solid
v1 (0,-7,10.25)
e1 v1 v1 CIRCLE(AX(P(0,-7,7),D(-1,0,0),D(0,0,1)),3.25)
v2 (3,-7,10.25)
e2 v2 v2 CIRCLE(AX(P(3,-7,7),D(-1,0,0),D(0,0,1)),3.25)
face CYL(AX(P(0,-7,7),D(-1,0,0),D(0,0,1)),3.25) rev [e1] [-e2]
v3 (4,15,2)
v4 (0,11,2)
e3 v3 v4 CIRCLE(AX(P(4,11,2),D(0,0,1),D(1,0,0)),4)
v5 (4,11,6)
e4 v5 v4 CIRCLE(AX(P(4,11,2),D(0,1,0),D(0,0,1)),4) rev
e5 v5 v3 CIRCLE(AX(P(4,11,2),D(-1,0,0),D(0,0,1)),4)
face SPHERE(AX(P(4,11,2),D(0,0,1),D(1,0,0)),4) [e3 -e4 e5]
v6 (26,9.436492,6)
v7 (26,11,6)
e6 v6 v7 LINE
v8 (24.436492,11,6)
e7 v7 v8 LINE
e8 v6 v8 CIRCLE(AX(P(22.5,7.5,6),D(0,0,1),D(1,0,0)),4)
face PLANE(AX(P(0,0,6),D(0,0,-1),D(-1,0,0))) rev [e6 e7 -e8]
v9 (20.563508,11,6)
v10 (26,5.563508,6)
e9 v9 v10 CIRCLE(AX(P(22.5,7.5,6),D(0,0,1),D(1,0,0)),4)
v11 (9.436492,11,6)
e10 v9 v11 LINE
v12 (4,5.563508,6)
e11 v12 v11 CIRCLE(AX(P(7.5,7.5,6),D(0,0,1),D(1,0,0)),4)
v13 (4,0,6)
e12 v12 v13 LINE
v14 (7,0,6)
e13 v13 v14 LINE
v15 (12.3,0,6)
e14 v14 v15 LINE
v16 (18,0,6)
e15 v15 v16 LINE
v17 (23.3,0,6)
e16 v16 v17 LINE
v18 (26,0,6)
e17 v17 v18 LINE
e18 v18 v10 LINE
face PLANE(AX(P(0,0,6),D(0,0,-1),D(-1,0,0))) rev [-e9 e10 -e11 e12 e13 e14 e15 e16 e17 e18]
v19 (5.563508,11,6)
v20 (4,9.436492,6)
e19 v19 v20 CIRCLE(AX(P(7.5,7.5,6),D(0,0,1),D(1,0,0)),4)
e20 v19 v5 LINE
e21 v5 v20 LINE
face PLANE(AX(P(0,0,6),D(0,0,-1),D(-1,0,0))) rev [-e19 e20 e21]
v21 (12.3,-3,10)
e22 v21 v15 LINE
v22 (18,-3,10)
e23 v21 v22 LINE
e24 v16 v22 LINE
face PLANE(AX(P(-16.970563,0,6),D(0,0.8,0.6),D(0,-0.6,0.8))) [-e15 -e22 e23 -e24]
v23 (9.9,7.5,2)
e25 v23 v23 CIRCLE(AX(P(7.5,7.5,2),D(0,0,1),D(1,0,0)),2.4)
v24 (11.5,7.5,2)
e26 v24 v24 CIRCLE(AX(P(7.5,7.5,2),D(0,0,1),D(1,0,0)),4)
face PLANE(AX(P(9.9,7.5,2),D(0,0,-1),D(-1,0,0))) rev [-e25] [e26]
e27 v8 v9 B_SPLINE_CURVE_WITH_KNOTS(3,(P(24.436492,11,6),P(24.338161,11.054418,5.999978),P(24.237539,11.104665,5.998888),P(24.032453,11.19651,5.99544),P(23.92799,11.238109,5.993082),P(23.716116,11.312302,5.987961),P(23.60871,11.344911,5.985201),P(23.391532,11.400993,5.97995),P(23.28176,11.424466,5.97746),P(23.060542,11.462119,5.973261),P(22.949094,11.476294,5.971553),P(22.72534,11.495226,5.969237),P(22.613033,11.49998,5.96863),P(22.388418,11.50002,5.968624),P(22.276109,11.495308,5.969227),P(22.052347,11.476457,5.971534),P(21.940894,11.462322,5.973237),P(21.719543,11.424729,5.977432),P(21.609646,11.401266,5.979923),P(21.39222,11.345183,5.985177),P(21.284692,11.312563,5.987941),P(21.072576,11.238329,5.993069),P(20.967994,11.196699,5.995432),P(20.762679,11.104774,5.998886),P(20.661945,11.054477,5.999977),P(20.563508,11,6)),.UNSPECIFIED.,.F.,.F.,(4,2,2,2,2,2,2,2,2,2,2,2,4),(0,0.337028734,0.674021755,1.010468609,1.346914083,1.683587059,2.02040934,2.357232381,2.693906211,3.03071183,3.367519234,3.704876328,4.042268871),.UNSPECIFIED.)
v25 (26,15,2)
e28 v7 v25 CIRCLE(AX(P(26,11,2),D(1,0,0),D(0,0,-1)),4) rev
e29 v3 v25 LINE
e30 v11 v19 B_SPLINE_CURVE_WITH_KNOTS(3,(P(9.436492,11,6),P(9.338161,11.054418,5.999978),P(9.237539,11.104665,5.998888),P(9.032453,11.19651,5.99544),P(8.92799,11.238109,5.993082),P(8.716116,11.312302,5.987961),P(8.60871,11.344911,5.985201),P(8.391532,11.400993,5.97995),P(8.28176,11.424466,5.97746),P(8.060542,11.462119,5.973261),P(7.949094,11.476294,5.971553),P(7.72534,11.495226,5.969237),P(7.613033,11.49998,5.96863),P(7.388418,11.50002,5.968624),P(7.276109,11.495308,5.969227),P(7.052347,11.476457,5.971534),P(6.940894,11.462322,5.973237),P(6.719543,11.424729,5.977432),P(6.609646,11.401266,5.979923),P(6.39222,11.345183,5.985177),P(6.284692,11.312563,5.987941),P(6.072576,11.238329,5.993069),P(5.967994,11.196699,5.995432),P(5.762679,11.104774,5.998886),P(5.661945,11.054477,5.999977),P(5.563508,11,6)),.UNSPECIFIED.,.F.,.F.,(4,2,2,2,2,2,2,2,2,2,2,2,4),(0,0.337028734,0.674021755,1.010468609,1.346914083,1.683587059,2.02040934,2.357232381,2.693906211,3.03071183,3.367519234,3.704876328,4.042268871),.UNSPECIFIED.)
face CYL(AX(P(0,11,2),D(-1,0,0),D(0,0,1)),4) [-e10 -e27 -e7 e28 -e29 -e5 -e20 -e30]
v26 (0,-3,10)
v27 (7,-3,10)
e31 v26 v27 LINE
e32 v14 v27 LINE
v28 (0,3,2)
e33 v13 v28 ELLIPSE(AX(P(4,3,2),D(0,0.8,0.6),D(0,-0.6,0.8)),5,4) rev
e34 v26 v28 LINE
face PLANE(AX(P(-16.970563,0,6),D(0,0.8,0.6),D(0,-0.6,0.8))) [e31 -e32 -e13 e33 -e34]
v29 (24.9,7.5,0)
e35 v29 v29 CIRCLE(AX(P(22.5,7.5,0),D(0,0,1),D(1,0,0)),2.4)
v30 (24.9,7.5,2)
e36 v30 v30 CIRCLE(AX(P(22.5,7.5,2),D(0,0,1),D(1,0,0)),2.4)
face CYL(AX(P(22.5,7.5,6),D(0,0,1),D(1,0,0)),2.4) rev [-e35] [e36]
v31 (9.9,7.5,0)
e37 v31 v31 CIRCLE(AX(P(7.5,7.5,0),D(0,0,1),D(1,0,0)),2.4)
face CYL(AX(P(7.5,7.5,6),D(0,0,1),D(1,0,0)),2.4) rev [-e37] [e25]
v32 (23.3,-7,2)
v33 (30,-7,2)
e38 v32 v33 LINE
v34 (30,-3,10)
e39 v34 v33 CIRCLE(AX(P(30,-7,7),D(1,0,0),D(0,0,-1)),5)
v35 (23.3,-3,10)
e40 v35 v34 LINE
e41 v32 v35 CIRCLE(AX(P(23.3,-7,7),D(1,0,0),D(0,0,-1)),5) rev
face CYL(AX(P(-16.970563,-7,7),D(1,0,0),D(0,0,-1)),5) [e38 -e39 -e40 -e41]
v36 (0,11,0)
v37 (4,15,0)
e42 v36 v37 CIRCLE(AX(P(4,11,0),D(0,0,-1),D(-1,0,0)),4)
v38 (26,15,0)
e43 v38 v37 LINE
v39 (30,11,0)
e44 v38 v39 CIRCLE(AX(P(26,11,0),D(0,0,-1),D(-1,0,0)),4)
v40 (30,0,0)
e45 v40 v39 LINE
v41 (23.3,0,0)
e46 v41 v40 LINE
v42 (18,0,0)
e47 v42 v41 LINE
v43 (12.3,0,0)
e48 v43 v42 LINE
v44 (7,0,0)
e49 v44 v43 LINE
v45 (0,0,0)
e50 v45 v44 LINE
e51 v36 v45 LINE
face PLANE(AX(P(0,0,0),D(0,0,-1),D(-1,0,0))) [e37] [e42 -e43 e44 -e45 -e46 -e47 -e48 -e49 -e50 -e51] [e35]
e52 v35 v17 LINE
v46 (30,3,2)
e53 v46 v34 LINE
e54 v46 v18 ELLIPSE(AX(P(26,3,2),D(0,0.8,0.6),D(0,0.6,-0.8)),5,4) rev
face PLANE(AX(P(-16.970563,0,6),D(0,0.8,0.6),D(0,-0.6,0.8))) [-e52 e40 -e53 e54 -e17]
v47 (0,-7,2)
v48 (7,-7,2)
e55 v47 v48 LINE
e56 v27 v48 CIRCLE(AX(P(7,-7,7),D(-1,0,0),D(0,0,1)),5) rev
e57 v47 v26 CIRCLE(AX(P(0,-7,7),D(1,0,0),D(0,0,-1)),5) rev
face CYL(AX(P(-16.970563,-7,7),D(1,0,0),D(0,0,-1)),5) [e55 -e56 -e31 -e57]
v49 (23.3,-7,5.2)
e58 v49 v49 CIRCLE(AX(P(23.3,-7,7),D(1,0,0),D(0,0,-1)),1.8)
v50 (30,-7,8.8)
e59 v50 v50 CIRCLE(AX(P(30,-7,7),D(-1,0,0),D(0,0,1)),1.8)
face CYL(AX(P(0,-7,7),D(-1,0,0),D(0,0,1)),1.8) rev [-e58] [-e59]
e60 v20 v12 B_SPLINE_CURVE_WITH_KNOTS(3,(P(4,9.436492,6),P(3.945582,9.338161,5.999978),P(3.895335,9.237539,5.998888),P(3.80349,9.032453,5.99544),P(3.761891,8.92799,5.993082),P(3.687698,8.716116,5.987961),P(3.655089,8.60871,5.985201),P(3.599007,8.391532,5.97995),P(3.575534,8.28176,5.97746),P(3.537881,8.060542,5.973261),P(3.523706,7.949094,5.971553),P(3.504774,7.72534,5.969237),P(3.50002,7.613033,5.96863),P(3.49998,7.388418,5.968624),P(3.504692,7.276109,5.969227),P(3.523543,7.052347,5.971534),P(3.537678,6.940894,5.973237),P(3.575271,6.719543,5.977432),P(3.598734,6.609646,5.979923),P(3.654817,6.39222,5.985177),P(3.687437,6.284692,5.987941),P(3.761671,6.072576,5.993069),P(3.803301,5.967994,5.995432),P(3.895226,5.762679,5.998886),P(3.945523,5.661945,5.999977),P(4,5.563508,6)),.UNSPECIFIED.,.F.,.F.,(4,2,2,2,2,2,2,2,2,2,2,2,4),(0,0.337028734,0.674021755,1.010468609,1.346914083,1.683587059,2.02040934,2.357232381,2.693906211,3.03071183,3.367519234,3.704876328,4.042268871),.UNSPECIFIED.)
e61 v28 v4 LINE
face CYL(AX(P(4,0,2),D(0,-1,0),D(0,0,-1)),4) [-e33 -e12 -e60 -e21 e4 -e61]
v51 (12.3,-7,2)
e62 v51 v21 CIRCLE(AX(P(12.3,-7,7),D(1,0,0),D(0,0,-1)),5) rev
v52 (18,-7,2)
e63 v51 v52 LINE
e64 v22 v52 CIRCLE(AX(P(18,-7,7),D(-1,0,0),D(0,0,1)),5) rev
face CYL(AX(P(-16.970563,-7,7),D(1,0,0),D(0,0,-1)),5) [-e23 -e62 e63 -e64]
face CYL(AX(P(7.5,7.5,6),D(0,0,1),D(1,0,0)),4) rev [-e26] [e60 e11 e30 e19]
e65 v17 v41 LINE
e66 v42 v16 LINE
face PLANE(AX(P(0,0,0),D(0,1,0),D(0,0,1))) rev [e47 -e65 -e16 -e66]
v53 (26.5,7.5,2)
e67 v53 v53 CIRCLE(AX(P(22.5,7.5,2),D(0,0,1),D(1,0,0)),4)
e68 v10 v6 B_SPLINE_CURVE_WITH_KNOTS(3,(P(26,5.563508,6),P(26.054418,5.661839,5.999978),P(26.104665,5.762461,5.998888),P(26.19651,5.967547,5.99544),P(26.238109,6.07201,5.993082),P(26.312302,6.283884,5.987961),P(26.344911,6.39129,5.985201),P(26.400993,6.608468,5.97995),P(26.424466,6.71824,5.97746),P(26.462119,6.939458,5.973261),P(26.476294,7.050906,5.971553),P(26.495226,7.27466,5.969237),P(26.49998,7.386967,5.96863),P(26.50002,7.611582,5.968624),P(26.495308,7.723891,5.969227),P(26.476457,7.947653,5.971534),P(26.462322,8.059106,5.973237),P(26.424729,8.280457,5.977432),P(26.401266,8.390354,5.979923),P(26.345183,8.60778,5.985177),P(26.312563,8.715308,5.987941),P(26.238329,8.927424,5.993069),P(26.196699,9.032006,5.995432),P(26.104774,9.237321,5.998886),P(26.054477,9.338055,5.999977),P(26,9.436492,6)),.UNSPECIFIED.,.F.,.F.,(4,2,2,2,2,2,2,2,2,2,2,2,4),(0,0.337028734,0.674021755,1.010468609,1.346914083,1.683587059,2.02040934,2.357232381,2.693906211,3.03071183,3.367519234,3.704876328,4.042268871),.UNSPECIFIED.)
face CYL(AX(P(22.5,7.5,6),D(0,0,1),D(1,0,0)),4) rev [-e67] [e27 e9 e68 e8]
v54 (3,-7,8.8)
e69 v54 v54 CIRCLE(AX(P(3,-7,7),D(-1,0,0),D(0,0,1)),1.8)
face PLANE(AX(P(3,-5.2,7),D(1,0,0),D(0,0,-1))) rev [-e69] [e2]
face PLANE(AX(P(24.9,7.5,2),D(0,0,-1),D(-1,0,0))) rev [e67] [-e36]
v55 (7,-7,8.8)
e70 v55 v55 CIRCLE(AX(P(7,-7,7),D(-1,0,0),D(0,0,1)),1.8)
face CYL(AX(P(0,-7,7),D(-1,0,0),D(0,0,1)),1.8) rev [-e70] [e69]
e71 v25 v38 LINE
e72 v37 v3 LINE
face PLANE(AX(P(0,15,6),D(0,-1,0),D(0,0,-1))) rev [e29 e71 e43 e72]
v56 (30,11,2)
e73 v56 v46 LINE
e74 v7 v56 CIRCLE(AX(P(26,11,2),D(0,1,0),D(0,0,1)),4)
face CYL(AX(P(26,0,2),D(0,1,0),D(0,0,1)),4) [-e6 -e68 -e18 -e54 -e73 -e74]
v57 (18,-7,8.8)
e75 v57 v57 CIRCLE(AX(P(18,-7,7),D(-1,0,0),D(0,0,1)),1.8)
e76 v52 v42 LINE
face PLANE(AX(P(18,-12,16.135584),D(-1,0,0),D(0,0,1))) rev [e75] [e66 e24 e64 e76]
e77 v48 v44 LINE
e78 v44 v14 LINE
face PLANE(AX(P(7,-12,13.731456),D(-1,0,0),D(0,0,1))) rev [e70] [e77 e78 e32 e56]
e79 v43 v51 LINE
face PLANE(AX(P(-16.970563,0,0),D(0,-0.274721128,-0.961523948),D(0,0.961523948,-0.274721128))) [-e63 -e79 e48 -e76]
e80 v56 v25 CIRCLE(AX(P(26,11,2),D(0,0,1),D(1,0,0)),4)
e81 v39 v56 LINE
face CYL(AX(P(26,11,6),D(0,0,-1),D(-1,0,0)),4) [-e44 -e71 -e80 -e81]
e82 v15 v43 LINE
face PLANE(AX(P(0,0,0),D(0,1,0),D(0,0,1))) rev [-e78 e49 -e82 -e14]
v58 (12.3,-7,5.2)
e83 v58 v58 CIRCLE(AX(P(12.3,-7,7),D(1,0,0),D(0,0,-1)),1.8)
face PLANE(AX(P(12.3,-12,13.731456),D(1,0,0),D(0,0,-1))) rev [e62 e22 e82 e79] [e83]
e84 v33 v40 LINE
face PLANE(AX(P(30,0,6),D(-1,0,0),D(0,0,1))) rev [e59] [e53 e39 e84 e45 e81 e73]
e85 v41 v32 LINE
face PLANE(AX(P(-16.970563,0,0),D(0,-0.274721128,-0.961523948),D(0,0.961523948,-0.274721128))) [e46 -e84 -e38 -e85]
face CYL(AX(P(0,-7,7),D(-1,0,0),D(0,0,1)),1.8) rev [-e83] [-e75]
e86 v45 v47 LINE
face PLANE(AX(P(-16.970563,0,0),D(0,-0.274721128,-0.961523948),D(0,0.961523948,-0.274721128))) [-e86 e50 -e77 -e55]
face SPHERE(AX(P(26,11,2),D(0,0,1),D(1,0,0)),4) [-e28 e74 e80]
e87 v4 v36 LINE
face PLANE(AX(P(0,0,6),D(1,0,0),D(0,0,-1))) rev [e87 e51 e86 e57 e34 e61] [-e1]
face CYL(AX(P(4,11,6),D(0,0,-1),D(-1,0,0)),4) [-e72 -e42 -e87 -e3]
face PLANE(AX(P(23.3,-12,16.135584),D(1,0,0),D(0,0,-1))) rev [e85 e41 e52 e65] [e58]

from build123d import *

# Parameters (mm, degrees)
SKETCH2_W                      = 30
SKETCH2_H                      = 15
BOSS_EXTRUDE1_DEPTH            = 6
CBORE_FOR_M4_SHCS1_D           = 4.8
CBORE_FOR_M4_SHCS1_CBORE_D     = 8
CBORE_FOR_M4_SHCS1_CBORE_DEPTH = 4
BOSS_EXTRUDE2_DEPTH            = 30
CUT_EXTRUDE1_START             = -15
SKETCH6_W                      = 5.3
SKETCH6_H                      = 20.435085946
SKETCH6_H_2                    = 17.047451378
CUT_EXTRUDE1_DEPTH             = 28.107006543
FILLET1_R                      = 4
CBORE_FOR_M3_SHCS1_D           = 3.6
CBORE_FOR_M3_SHCS1_CBORE_D     = 6.5
CBORE_FOR_M3_SHCS1_CBORE_DEPTH = 3


with BuildPart() as part:
    # Sketch2 → Boss-Extrude1 (new body)
    with BuildSketch(Plane.XY):
        with Locations((15, 7.5)):
            Rectangle(SKETCH2_W, SKETCH2_H)
    extrude(amount=BOSS_EXTRUDE1_DEPTH)

    # CBORE for M4 SHCS1 (through all)
    with Locations(Plane.XY.offset(6)):
        with Locations((7.5, 7.5), (22.5, 7.5)):
            CounterBoreHole(CBORE_FOR_M4_SHCS1_D / 2, CBORE_FOR_M4_SHCS1_CBORE_D / 2, CBORE_FOR_M4_SHCS1_CBORE_DEPTH)

    # Sketch5 → Boss-Extrude2 (add)
    with BuildSketch(Plane(origin=(30, 0, 0), x_dir=(0, 0, -1), z_dir=(1, 0, 0))):
        with BuildLine():
            Line((0, 0), (-2, -7))
            ThreePointArc((-2, -7), (-9.236067977, -11.472135955), (-10, -3))
            Line((-10, -3), (-6, 0))
            Line((-6, 0), (0, 0))
        make_face()
    extrude(amount=-BOSS_EXTRUDE2_DEPTH)

    # Sketch6 → Cut-Extrude1 (cut, through all)
    with BuildSketch(Plane(origin=(0, 15, 0), x_dir=(1, 0, 0), z_dir=(0, 1, 0)).offset(CUT_EXTRUDE1_START)):
        with Locations((20.65, -5.918041099)):
            Rectangle(SKETCH6_W, SKETCH6_H)
        with Locations((9.65, -5.207730625)):
            Rectangle(SKETCH6_W, SKETCH6_H_2)
    extrude(amount=-CUT_EXTRUDE1_DEPTH, mode=Mode.SUBTRACT)

    # Fillet1
    # the kernel refuses this fillet: 4 mm, written as the material it takes off along each edge
    with BuildSketch(Plane(origin=(26, 11, 2), x_dir=(0, 0, 1), z_dir=(0, 1, 0))) as fillet1_piece_1_section:
        Polygon((0, 0), (FILLET1_R, 0), (FILLET1_R, FILLET1_R), (0, FILLET1_R), align=None)
    fillet1_piece_1 = extrude(amount=FILLET1_R, mode=Mode.PRIVATE)
    fillet1_piece_1 = fillet1_piece_1 - Plane(origin=(26, 11, 2), x_dir=(-0.7071067811865475, 0, -0.7071067811865475), z_dir=(0, 1, 0)) * Sphere(FILLET1_R, mode=Mode.PRIVATE)
    add(fillet1_piece_1, mode=Mode.SUBTRACT)
    with BuildSketch(Plane(origin=(4, 11, 2), x_dir=(0, 1, 0), z_dir=(-1, 0, 0))) as fillet1_piece_2_section:
        Polygon((0, 0), (FILLET1_R, 0), (FILLET1_R, -FILLET1_R), (0, -FILLET1_R), align=None)
    fillet1_piece_2 = extrude(amount=FILLET1_R, mode=Mode.PRIVATE)
    fillet1_piece_2 = fillet1_piece_2 - Plane(origin=(4, 11, 2), x_dir=(0, -0.7071067811865475, -0.7071067811865475), z_dir=(-1, 0, 0)) * Sphere(FILLET1_R, mode=Mode.PRIVATE)
    add(fillet1_piece_2, mode=Mode.SUBTRACT)
    with BuildSketch(Plane(origin=(30, -10, 6), x_dir=(-1, 0, 0), z_dir=(0, 1, 0))) as fillet1_piece_3_section:
        with BuildLine():
            CenterArc((FILLET1_R, -FILLET1_R), FILLET1_R, 90, 90)
            Line((0, -FILLET1_R), (0, 0))
            Line((0, 0), (FILLET1_R, 0))
        make_face()
    fillet1_piece_3 = extrude(amount=21, mode=Mode.PRIVATE)
    fillet1_piece_3 = split(fillet1_piece_3, bisect_by=Plane(origin=(29.062495656, 2.503698405, 2.66173546), z_dir=(0, 0.8, 0.6)), keep=Keep.TOP, mode=Mode.PRIVATE)
    add(fillet1_piece_3, mode=Mode.SUBTRACT)
    with BuildSketch(Plane(origin=(26, 15, 6), x_dir=(0, 0, -1), z_dir=(-1, 0, 0))) as fillet1_piece_4:
        with BuildLine():
            CenterArc((FILLET1_R, FILLET1_R), FILLET1_R, 180, 90)
            Line((0, FILLET1_R), (0, 0))
            Line((0, 0), (FILLET1_R, 0))
        make_face()
    extrude(amount=22, mode=Mode.SUBTRACT)
    with BuildSketch(Plane(origin=(0, 11, 6), x_dir=(0, 0, -1), z_dir=(0, -1, 0))) as fillet1_piece_5_section:
        with BuildLine():
            CenterArc((FILLET1_R, FILLET1_R), FILLET1_R, 180, 90)
            Line((0, FILLET1_R), (0, 0))
            Line((0, 0), (FILLET1_R, 0))
        make_face()
    fillet1_piece_5 = extrude(amount=21, mode=Mode.PRIVATE)
    fillet1_piece_5 = split(fillet1_piece_5, bisect_by=Plane(origin=(0.937504344, 2.503698405, 2.66173546), z_dir=(0, 0.8, 0.6)), keep=Keep.TOP, mode=Mode.PRIVATE)
    add(fillet1_piece_5, mode=Mode.SUBTRACT)
    with BuildSketch(Plane(origin=(0, 15, -10), x_dir=(0, -1, 0), z_dir=(0, 0, 1)), Plane(origin=(30, 15, -10), x_dir=(-1, 0, 0), z_dir=(0, 0, 1))) as fillet1_piece_6:
        with BuildLine():
            CenterArc((FILLET1_R, FILLET1_R), FILLET1_R, 180, 90)
            Line((0, FILLET1_R), (0, 0))
            Line((0, 0), (FILLET1_R, 0))
        make_face()
    extrude(amount=12, mode=Mode.SUBTRACT)

    # CBORE for M3 SHCS1 (through all)
    with Locations(Plane.ZY):
        with Locations((7, -7)):
            CounterBoreHole(CBORE_FOR_M3_SHCS1_D / 2, CBORE_FOR_M3_SHCS1_CBORE_D / 2, CBORE_FOR_M3_SHCS1_CBORE_DEPTH)


solid = part.part
